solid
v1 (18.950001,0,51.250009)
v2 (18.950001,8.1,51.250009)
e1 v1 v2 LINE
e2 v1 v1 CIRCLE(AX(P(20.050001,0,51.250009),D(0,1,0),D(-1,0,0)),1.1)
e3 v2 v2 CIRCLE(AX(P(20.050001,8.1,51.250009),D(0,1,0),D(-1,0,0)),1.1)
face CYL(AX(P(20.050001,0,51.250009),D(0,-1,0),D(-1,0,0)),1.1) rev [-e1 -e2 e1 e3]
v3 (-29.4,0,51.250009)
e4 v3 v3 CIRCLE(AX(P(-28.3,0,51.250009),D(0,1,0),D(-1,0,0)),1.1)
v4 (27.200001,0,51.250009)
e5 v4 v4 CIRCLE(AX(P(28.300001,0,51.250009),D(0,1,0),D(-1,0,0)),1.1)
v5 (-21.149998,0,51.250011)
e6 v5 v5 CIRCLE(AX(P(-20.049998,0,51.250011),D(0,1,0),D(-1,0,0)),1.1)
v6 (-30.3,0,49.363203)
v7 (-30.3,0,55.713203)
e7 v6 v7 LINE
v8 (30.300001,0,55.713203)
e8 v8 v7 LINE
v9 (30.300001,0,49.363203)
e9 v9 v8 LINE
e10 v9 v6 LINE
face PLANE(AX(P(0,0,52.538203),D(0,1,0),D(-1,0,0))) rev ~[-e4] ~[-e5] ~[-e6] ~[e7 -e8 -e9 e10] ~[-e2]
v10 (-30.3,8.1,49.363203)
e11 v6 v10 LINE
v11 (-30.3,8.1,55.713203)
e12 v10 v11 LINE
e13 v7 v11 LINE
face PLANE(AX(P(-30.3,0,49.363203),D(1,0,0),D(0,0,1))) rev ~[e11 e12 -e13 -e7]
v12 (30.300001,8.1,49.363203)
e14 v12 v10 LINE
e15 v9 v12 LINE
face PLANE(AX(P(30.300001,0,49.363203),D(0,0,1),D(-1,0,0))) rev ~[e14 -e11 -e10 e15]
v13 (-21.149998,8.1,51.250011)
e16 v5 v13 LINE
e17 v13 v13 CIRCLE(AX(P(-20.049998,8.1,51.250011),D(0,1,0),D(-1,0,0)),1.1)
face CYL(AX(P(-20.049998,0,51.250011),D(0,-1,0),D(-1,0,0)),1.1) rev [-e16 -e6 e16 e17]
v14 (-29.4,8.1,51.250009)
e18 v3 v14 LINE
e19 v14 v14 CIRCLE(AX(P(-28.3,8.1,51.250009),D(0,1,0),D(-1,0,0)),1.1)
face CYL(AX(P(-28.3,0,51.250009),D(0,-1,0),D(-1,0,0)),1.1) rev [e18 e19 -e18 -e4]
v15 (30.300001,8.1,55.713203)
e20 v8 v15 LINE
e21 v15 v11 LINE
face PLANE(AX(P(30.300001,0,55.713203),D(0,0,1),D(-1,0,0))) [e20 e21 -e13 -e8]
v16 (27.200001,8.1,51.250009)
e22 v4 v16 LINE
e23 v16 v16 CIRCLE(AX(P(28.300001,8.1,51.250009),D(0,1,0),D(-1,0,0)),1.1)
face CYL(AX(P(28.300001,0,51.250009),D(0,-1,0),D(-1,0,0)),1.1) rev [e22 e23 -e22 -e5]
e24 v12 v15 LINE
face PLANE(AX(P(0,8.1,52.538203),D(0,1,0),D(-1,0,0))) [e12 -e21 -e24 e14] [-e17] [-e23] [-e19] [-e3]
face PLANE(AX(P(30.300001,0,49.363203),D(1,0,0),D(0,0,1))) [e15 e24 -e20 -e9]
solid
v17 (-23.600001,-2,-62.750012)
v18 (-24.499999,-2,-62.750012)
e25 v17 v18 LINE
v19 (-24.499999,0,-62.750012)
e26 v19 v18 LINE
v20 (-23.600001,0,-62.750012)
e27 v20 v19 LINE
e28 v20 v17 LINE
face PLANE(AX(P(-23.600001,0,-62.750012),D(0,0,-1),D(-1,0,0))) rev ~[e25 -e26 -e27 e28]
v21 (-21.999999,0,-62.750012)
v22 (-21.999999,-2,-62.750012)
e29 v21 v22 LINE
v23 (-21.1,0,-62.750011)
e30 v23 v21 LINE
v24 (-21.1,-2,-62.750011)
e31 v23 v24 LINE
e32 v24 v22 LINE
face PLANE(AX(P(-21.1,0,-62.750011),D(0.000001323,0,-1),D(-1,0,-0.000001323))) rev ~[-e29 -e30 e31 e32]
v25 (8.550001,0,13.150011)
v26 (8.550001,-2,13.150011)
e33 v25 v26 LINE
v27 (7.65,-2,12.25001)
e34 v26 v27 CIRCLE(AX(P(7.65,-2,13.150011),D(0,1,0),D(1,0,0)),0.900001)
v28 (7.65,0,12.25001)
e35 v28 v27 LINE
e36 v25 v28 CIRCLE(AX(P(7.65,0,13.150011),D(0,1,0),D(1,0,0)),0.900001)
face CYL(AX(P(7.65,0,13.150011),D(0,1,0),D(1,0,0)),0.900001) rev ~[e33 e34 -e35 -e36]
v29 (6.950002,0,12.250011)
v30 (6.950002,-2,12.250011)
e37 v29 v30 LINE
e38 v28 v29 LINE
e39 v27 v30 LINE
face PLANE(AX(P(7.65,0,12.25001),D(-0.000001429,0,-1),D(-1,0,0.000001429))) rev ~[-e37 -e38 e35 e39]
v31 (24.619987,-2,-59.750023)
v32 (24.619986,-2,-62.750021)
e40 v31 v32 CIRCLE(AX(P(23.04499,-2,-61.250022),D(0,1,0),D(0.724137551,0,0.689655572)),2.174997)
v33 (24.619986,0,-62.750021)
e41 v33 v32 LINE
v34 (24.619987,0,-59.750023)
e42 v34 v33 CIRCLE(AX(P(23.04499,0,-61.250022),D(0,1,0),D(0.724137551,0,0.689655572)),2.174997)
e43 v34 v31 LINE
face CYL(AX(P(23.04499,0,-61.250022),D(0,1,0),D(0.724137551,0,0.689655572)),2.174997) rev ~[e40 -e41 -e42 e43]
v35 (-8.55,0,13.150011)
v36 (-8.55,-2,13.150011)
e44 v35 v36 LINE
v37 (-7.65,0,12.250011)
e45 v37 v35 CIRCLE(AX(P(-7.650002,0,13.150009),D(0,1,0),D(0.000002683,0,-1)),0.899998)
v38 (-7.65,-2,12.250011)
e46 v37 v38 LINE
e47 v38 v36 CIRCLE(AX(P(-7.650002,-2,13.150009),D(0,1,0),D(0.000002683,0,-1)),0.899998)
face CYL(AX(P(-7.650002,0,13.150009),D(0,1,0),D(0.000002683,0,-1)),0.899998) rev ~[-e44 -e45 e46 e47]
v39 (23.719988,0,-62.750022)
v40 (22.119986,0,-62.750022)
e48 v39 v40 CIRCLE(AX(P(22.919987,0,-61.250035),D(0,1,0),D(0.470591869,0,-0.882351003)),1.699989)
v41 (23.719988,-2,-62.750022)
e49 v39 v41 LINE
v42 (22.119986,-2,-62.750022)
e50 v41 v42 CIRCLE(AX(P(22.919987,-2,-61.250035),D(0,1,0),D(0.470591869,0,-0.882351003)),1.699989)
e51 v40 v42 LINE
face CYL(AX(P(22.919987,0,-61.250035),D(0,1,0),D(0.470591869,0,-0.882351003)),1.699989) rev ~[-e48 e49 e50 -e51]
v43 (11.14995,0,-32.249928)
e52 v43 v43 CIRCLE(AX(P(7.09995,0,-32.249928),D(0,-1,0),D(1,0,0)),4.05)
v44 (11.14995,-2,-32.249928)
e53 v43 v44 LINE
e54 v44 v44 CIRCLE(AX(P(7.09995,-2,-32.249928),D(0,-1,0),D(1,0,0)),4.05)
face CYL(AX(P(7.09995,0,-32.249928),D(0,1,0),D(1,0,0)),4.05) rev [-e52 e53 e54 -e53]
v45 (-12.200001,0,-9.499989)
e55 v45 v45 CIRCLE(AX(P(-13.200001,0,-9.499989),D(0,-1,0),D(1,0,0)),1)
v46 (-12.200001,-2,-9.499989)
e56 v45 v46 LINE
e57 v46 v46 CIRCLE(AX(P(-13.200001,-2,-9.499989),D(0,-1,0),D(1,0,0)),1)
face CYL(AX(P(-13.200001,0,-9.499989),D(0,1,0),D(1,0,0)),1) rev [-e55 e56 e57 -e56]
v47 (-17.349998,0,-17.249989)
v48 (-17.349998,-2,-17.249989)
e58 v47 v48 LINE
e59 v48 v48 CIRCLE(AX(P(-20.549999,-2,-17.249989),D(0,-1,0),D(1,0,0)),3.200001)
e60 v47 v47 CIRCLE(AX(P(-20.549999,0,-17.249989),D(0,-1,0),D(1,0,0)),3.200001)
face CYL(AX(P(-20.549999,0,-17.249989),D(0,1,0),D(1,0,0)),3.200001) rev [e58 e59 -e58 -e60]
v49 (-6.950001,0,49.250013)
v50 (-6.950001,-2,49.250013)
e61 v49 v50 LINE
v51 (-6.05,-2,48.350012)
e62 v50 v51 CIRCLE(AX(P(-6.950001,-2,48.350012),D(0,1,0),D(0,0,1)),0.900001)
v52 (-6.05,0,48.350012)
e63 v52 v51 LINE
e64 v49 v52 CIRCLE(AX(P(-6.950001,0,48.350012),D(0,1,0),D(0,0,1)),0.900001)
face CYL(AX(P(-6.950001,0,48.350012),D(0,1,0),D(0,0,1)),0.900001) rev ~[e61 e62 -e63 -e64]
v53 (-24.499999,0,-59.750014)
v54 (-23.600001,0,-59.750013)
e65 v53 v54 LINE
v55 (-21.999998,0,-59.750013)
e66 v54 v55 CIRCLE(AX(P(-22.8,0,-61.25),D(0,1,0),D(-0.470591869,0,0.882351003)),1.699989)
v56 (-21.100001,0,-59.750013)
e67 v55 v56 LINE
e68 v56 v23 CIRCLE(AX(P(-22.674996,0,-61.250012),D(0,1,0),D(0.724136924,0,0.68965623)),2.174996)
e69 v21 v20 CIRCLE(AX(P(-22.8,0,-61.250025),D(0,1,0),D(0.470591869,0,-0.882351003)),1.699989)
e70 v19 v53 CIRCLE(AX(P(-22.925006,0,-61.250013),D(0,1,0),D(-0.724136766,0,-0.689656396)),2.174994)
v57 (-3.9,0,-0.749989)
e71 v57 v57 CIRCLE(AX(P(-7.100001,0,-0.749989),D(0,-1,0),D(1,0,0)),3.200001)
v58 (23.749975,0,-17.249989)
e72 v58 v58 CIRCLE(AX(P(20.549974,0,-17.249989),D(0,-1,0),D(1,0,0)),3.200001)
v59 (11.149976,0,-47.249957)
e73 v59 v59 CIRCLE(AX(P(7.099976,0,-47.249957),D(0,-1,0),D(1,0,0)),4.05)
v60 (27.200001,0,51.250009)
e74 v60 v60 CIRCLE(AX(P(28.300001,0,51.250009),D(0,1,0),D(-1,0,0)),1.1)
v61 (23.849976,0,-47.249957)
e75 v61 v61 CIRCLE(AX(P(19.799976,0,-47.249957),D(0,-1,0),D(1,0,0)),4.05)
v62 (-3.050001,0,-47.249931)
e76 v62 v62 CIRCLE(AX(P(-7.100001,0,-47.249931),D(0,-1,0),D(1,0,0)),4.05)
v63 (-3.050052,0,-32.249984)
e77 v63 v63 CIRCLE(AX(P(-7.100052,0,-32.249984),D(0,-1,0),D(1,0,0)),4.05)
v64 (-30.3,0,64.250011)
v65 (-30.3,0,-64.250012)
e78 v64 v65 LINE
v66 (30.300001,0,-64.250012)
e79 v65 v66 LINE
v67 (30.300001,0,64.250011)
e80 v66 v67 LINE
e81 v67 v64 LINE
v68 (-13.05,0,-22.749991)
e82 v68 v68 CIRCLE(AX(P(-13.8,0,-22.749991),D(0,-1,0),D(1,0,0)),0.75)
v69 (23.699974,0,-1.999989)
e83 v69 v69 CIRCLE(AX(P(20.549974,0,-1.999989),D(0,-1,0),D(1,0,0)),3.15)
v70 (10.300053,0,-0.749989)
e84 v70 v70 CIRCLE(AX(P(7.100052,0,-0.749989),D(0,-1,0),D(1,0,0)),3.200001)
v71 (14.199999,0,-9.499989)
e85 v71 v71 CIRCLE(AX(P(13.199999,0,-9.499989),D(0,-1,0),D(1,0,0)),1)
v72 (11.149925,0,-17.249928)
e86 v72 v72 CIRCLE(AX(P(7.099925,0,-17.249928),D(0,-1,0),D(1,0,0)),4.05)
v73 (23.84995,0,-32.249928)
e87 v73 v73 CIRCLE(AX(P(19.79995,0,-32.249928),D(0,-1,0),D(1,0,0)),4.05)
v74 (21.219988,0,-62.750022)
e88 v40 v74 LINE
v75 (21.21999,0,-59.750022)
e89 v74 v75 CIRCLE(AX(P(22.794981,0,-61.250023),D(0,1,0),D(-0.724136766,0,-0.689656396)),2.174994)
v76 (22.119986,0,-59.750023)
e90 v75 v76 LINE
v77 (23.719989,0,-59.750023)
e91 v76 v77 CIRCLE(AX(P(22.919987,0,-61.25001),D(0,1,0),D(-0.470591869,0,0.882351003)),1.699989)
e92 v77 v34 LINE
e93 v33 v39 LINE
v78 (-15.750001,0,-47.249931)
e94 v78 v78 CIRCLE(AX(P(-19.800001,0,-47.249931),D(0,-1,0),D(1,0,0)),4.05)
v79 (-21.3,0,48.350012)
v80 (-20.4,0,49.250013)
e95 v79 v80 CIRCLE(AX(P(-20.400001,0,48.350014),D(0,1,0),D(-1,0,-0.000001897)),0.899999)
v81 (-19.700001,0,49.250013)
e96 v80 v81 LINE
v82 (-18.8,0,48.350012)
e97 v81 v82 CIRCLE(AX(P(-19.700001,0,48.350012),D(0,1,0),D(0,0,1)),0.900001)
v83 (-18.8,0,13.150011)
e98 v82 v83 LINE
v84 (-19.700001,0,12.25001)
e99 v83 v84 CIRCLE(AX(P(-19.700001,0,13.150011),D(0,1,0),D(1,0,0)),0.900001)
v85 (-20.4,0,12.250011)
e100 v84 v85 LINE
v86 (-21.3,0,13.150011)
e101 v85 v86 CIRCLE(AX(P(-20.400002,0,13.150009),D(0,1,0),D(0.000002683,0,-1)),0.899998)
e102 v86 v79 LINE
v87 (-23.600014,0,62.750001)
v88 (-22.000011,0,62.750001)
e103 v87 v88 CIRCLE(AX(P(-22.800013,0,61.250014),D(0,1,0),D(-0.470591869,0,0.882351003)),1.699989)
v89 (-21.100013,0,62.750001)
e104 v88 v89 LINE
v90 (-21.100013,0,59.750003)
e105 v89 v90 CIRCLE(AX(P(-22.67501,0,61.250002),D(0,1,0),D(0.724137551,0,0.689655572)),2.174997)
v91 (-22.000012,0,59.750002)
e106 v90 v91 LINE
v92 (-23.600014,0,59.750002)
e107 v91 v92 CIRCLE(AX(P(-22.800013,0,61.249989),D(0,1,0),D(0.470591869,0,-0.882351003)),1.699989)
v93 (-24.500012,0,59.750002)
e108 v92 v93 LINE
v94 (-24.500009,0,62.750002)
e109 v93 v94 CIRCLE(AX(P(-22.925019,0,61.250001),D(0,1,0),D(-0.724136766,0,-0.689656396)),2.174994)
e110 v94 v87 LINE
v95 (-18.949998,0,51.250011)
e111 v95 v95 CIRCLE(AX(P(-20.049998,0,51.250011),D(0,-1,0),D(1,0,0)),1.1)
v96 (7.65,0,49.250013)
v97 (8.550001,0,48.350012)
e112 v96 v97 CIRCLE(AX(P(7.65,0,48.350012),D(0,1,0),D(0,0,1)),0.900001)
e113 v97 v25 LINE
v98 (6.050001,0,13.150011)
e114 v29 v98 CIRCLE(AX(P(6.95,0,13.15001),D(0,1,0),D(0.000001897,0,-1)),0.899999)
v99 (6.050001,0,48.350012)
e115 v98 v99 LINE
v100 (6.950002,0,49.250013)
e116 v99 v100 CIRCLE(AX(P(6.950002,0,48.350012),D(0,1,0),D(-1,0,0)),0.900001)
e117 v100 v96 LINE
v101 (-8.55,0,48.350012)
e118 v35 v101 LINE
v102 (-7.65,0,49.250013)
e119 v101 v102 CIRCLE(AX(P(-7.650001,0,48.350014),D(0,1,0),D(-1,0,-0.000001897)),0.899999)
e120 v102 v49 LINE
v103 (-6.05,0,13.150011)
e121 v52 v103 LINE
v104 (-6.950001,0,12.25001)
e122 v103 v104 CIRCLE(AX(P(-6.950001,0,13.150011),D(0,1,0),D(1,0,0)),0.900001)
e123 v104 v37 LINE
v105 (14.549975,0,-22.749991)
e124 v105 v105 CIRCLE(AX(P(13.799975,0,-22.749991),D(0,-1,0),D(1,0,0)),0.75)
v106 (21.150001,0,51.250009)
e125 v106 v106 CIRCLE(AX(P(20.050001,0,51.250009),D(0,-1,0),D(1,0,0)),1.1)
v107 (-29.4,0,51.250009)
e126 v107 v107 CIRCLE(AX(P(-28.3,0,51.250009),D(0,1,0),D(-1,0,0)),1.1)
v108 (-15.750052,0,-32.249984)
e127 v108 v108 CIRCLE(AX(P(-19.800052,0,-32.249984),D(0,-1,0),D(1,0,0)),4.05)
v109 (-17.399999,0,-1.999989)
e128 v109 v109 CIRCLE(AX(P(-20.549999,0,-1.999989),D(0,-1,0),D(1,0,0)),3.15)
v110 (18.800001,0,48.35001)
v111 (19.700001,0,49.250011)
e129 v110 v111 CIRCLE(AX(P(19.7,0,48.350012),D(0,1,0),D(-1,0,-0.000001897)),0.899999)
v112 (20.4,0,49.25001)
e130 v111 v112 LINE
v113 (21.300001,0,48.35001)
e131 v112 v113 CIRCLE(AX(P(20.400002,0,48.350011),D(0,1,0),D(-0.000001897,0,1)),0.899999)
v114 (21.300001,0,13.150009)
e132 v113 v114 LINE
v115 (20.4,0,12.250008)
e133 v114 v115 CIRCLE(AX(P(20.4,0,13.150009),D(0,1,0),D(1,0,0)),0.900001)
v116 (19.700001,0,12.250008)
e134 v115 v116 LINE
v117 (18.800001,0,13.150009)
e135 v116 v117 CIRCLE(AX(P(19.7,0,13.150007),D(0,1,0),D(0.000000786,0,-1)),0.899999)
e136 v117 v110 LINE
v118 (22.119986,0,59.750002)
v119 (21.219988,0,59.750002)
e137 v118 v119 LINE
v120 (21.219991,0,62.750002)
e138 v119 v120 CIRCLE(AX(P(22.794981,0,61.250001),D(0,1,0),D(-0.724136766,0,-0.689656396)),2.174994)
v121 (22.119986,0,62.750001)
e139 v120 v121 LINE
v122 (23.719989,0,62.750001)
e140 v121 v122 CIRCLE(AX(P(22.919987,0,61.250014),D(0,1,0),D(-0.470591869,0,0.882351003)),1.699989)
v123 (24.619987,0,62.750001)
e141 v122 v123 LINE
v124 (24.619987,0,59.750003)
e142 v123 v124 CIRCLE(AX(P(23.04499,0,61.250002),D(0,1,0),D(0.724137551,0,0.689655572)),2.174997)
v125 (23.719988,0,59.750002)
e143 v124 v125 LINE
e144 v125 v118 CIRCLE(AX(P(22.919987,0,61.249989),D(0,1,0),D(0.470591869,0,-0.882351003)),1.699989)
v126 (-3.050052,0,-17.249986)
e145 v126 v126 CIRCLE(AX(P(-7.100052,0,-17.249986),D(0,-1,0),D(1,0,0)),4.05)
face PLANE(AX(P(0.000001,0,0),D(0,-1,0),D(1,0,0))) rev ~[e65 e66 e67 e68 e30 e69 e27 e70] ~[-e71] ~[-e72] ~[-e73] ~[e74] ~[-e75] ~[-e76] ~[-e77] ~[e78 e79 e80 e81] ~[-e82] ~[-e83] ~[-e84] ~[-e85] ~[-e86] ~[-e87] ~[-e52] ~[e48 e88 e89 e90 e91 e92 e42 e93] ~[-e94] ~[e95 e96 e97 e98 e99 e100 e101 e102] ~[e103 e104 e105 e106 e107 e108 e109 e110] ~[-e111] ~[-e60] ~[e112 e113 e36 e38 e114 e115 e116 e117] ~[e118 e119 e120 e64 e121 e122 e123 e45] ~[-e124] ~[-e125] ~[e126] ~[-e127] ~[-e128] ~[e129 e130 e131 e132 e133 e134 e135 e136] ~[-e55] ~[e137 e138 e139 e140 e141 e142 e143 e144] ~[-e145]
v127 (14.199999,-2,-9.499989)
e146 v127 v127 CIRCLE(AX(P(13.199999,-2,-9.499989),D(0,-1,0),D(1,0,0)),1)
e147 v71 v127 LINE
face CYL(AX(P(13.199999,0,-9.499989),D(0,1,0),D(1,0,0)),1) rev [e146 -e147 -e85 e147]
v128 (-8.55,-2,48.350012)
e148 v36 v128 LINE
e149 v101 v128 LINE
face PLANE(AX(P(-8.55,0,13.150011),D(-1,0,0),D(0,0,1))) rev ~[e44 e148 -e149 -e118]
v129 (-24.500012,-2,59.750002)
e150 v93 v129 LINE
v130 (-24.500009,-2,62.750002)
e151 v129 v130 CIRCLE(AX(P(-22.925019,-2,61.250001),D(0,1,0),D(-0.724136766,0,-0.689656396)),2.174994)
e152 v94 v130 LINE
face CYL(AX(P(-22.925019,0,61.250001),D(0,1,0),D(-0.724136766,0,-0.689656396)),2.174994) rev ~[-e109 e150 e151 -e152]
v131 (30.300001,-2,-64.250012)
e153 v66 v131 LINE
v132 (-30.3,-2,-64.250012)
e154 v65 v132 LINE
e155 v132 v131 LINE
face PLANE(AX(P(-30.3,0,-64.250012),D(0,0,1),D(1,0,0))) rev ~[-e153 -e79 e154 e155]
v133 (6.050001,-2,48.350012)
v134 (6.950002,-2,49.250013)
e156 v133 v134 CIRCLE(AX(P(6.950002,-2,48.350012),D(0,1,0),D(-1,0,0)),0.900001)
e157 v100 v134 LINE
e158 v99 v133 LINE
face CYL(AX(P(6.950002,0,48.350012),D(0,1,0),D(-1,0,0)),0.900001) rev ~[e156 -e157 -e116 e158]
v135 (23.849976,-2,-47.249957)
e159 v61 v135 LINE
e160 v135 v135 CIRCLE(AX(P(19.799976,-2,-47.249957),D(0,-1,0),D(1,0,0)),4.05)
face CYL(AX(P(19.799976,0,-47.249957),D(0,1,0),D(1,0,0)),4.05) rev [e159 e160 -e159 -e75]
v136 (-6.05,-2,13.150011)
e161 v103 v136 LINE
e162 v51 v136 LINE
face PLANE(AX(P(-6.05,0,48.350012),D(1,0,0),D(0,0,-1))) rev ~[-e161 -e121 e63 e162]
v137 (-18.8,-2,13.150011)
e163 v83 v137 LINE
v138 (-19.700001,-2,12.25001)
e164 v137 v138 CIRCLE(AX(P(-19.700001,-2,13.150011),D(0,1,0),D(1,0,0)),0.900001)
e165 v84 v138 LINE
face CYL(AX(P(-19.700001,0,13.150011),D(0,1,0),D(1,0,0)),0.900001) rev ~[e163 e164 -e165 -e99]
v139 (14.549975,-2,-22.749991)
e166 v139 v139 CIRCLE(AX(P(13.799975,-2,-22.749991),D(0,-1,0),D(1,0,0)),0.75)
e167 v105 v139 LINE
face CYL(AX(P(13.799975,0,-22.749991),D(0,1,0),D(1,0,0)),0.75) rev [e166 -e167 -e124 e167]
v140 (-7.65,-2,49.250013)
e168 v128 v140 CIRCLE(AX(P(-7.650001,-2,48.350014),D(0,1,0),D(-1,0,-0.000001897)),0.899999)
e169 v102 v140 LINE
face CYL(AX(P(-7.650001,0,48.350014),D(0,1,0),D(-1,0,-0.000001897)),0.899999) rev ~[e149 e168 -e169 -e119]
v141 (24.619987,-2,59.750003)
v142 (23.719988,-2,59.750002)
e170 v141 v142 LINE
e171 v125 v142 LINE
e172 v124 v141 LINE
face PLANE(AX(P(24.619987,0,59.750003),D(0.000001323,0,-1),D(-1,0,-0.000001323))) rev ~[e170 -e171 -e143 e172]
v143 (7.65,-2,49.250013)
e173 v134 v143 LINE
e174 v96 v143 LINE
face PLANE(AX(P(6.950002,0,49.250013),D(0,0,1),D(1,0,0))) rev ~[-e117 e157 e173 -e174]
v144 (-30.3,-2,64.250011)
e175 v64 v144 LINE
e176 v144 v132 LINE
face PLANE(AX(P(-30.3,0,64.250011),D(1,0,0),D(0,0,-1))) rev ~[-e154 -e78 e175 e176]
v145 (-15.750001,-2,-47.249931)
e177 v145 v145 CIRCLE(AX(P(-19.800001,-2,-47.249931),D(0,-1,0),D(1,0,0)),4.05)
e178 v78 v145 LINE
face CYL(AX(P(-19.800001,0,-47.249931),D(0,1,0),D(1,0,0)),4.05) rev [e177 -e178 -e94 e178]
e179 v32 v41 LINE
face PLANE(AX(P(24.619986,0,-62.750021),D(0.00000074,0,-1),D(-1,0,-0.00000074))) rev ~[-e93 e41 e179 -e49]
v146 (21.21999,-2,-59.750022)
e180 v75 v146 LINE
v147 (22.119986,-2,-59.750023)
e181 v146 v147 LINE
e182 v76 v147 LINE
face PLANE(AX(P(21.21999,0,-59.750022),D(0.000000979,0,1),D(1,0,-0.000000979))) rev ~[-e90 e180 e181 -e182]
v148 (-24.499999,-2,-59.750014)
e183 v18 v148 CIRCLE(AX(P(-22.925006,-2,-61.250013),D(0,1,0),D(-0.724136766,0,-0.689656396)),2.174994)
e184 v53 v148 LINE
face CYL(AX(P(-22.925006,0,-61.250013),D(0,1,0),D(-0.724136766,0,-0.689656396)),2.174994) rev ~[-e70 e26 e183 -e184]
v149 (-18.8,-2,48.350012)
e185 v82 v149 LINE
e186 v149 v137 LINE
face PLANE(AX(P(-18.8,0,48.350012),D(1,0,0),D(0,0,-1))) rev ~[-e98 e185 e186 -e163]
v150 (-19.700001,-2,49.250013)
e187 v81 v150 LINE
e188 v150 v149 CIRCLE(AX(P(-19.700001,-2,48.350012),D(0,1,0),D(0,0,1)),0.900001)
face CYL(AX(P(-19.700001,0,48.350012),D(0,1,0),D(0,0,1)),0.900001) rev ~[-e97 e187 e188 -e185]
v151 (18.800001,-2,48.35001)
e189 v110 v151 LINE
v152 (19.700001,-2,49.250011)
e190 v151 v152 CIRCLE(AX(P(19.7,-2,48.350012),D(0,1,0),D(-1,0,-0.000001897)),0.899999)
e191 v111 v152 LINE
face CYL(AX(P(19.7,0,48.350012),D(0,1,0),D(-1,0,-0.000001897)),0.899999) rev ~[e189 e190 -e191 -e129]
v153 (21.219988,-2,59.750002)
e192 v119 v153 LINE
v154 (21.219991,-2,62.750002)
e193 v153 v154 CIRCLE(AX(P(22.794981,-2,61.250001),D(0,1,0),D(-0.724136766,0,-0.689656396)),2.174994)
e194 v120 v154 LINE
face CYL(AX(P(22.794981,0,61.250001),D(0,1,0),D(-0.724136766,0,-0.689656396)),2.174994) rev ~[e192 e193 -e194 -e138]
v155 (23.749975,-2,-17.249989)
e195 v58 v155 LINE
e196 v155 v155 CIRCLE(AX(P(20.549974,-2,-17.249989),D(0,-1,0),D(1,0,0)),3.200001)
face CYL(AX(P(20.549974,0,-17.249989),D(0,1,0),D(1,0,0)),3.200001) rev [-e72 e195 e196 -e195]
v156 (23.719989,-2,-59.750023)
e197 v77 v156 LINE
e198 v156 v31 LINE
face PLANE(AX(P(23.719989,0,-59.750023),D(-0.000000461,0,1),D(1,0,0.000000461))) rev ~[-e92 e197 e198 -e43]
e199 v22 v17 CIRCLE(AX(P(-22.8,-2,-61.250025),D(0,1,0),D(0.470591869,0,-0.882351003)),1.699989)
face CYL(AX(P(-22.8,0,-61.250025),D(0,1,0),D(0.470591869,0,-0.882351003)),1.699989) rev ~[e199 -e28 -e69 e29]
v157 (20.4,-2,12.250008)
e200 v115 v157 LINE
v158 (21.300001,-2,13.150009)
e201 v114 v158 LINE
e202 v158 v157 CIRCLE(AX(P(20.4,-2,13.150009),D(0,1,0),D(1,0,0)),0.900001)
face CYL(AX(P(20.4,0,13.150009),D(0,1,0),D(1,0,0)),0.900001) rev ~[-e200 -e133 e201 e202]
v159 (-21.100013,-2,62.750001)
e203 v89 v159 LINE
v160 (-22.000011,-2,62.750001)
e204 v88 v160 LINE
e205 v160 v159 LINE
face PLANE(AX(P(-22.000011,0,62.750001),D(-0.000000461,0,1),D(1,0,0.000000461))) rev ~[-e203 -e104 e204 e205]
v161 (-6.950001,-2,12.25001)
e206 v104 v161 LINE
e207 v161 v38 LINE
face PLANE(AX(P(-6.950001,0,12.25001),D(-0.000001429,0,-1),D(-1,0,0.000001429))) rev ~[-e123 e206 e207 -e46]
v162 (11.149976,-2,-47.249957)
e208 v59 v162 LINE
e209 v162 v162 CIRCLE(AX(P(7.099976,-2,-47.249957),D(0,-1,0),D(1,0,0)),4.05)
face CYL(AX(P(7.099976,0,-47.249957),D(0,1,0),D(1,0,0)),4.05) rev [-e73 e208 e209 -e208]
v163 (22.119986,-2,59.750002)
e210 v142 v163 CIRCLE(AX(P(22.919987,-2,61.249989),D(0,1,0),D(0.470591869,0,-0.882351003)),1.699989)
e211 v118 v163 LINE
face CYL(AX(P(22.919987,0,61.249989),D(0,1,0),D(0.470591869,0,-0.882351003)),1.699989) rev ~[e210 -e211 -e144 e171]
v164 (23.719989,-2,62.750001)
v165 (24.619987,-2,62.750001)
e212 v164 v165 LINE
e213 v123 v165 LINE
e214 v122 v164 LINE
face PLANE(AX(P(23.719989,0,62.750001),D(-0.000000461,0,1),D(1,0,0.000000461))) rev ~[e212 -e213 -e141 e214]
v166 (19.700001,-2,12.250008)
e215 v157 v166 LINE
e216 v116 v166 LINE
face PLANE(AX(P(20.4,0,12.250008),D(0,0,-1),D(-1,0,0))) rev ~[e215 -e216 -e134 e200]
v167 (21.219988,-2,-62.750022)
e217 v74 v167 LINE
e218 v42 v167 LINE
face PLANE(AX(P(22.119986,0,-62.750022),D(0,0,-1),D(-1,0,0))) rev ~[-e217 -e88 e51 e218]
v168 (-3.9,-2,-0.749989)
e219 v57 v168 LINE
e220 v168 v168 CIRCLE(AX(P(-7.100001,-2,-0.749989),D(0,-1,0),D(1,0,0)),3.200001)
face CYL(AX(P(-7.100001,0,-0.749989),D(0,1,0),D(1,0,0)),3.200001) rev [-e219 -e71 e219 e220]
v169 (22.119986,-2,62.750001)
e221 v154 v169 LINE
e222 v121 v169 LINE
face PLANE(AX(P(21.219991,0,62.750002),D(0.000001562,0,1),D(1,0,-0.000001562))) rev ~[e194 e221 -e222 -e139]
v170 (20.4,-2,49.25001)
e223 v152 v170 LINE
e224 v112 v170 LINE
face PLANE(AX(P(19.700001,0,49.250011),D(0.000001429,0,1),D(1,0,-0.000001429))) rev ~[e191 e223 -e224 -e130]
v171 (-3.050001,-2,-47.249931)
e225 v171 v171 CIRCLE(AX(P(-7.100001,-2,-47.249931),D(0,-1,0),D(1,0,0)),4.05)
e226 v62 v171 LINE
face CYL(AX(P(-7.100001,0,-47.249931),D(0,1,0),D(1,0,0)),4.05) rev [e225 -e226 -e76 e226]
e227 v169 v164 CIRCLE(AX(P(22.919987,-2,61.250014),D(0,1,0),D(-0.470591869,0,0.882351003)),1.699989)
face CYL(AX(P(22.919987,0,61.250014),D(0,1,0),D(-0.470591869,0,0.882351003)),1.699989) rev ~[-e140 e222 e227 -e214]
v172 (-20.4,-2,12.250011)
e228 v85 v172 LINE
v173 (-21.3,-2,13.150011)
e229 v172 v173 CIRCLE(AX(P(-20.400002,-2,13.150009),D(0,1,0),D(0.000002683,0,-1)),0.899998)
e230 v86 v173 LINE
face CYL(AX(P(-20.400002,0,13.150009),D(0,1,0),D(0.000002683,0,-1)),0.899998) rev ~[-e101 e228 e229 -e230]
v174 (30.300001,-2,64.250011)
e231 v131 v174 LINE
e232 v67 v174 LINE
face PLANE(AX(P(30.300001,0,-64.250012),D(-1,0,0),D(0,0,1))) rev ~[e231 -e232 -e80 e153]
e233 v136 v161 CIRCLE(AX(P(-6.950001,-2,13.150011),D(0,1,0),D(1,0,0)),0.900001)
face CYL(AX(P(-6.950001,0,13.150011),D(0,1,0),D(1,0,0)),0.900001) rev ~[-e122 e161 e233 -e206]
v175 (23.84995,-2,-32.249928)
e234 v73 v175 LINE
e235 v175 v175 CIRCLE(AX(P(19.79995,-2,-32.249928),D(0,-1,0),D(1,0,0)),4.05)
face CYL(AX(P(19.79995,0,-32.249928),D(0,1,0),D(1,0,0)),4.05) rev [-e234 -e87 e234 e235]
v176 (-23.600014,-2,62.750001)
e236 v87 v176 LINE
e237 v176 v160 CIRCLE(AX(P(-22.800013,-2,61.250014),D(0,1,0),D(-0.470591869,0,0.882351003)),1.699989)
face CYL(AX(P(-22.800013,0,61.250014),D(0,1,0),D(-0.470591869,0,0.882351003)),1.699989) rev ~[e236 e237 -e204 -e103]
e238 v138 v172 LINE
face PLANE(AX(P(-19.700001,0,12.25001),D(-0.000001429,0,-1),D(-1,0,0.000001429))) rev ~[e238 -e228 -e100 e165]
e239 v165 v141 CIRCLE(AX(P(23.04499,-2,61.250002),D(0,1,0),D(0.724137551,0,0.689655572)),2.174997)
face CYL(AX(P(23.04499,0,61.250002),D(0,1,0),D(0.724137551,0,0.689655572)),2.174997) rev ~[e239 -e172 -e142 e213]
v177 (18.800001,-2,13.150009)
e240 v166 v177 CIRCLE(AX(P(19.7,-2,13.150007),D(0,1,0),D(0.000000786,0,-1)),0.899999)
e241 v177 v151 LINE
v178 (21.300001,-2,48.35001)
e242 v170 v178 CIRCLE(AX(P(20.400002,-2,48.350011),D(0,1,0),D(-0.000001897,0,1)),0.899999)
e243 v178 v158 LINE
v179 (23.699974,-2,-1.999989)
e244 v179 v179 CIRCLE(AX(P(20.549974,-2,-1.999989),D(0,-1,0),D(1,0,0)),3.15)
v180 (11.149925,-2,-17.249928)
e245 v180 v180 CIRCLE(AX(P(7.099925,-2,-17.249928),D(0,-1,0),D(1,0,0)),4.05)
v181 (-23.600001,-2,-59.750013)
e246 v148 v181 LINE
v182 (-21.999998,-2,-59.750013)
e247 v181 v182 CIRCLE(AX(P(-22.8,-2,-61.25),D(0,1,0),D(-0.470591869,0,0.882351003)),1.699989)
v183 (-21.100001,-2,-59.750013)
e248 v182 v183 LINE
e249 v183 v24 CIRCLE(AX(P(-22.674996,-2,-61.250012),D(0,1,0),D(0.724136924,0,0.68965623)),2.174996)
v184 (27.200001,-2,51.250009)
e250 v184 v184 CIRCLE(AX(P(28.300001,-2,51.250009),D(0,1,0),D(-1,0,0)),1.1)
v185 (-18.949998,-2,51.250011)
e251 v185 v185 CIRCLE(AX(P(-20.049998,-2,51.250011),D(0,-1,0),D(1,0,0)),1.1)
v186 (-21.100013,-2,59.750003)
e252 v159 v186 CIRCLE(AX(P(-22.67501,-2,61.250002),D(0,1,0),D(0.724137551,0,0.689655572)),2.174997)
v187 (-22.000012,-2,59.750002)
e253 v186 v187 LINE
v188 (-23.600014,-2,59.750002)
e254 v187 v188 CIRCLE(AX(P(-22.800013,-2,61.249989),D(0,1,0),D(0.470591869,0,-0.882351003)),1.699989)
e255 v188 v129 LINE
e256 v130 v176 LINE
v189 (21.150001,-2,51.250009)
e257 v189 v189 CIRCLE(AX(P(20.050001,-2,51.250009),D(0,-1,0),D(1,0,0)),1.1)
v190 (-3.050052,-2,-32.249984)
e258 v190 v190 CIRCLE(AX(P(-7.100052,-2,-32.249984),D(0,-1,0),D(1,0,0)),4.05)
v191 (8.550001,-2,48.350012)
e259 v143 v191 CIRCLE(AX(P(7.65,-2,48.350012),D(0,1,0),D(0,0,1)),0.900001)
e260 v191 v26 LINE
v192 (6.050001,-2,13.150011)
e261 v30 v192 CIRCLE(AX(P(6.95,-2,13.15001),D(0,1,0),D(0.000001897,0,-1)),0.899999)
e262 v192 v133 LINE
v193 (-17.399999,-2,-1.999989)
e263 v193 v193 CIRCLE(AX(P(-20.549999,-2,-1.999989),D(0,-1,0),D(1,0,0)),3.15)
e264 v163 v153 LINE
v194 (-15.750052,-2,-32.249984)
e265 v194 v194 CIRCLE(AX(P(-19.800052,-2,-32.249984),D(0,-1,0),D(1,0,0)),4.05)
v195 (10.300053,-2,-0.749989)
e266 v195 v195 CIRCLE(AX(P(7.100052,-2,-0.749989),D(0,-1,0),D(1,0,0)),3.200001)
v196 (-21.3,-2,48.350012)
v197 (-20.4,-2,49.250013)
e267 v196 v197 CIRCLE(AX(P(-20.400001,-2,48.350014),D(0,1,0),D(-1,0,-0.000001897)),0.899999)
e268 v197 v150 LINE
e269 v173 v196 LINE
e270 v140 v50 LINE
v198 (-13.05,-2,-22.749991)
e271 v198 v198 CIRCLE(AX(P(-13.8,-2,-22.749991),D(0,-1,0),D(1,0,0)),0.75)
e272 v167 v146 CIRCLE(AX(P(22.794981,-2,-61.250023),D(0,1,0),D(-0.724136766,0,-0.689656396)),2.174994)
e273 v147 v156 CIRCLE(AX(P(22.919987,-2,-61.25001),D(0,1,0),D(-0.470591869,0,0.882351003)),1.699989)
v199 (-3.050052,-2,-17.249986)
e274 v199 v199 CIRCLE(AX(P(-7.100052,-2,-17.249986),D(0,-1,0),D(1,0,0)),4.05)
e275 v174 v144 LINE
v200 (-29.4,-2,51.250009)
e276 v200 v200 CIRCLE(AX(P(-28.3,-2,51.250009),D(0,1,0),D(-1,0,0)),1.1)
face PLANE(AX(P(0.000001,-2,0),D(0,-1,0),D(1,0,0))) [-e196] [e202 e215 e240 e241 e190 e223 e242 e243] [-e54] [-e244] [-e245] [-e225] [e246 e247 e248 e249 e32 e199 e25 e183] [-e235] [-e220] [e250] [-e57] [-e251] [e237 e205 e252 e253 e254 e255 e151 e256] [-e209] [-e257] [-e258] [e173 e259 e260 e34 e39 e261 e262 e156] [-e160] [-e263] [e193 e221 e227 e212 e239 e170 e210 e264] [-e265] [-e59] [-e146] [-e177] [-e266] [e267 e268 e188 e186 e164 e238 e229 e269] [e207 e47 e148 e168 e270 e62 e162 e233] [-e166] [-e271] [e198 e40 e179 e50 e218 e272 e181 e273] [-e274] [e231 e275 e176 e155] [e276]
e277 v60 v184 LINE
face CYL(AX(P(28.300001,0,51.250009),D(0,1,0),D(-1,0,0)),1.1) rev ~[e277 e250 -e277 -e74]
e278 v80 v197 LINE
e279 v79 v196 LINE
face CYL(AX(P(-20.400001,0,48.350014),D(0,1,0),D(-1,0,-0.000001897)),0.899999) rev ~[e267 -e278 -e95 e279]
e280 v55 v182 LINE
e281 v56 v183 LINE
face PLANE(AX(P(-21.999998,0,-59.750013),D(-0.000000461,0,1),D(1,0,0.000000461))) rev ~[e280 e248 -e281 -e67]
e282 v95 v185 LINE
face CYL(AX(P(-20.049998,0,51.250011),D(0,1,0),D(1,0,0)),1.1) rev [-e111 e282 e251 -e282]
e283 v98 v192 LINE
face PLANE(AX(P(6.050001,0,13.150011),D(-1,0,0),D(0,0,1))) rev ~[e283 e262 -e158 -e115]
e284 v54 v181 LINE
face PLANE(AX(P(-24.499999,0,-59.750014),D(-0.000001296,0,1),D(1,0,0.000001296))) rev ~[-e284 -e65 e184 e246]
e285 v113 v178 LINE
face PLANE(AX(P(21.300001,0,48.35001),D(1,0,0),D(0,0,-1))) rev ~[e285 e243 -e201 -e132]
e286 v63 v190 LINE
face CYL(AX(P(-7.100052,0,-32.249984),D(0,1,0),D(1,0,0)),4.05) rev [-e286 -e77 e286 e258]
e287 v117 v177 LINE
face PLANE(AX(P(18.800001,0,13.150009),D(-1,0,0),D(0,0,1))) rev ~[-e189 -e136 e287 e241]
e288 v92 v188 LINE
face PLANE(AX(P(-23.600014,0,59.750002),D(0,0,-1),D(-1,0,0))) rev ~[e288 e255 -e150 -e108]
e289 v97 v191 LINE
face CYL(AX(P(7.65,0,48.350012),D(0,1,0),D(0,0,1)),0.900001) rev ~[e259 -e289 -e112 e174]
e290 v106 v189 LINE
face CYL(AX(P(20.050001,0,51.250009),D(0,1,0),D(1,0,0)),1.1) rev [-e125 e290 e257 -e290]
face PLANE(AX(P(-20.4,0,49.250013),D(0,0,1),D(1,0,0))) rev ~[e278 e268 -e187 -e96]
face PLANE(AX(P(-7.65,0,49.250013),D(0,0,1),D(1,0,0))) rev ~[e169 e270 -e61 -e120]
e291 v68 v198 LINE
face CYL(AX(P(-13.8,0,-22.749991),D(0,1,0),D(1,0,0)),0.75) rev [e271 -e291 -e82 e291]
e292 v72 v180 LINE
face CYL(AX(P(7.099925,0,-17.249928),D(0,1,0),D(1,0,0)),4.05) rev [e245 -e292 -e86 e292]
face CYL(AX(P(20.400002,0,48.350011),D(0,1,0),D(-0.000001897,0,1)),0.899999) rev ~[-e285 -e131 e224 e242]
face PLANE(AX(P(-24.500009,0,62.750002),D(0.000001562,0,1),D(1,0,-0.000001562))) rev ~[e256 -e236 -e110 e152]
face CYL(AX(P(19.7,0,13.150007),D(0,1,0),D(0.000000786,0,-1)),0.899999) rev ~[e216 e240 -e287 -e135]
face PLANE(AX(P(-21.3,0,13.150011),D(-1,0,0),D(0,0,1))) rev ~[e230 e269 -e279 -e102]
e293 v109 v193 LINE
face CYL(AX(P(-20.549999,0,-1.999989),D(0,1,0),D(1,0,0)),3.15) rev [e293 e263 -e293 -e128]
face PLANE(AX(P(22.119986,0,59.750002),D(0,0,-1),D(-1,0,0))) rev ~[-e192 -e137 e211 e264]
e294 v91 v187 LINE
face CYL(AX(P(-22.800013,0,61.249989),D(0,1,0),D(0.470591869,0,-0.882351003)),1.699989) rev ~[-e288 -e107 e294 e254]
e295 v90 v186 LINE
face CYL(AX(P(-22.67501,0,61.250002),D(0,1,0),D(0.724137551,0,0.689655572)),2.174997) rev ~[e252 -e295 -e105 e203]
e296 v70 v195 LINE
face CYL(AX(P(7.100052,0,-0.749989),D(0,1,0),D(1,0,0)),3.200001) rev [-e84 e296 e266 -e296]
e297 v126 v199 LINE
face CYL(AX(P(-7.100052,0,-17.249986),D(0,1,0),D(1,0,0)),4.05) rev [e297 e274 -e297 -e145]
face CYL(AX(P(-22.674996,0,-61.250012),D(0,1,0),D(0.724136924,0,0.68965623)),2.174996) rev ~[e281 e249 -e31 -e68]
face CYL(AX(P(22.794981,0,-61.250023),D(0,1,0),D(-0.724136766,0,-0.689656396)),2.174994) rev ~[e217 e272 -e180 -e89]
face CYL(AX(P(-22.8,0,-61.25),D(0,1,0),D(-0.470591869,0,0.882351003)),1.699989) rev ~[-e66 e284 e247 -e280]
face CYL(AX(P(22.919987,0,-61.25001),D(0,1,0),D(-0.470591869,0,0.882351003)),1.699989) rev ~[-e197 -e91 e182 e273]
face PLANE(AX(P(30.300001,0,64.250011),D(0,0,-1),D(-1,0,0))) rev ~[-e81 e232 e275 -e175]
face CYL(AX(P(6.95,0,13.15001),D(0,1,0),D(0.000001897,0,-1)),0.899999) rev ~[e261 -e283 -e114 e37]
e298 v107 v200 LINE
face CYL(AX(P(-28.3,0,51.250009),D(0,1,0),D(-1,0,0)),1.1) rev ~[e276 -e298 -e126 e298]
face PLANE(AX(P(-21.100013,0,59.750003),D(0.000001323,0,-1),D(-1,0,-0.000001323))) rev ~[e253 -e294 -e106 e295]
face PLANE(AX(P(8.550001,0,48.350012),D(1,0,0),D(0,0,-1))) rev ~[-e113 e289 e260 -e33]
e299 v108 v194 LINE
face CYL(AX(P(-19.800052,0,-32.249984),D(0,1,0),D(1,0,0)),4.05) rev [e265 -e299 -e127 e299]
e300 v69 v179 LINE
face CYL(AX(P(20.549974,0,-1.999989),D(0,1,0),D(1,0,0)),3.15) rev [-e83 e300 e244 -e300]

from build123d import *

# Parameters (mm, degrees)
F0_R     = 4.05
F0_R_2   = 3.200001
F0_R_3   = 3.15
F0_R_4   = 0.75
F0_R_5   = 1
F0_R_6   = 1.1
F1_DEPTH = 2
F2_W     = 60.600001
F2_H     = 6.35
F2_R     = 1.1
F3_DEPTH = 8.1
F4_R     = 1.1
F5_DEPTH = 25


# Not quite as in the source:
# - ends of sketch curves that miss each other by under 0.0002 mm in the source are joined


with BuildPart() as f1:
    # F0 (on Front) → F1 (new body)
    with BuildSketch(Plane.XZ):
        Polygon((-30.3, -61.250013), (-30.3, -64.250012), (30.300001, -64.250012), (30.300001, 64.250011), (-30.3, 64.250011), align=None)
        with BuildLine():
            ThreePointArc((-23.600001, -59.750013), (-22.7999995588, -59.550011), (-21.9999982215, -59.7500134152))
            Line((-21.9999982215, -59.7500134152), (-21.100001, -59.750013))
            ThreePointArc((-21.100001, -59.750013), (-20.5, -61.2500126379), (-21.1000001998, -62.7500108097))
            Line((-21.1000001998, -62.7500108097), (-21.999999, -62.750012))
            ThreePointArc((-21.999999, -62.750012), (-22.7999995588, -62.950014), (-23.600001, -62.750012))
            Line((-23.600001, -62.750012), (-24.499999, -62.750012))
            ThreePointArc((-24.499999, -62.750012), (-25.1, -61.2500126379), (-24.4999988252, -59.7500141665))
            Line((-24.4999988252, -59.7500141665), (-23.600001, -59.750013))
        make_face(mode=Mode.SUBTRACT)
        with Locations((-19.800001, -47.249931)):
            Circle(F0_R, mode=Mode.SUBTRACT)
        with Locations((-19.800052, -32.249984)):
            Circle(F0_R, mode=Mode.SUBTRACT)
        with Locations((-7.100001, -47.249931)):
            Circle(F0_R, mode=Mode.SUBTRACT)
        with Locations((-7.100052, -32.249984)):
            Circle(F0_R, mode=Mode.SUBTRACT)
        with Locations((-20.549999, -17.249989)):
            Circle(F0_R_2, mode=Mode.SUBTRACT)
        with Locations((-20.549999, -1.999989)):
            Circle(F0_R_3, mode=Mode.SUBTRACT)
        with Locations((-13.8, -22.749991)):
            Circle(F0_R_4, mode=Mode.SUBTRACT)
        with Locations((-7.100052, -17.249986)):
            Circle(F0_R, mode=Mode.SUBTRACT)
        with Locations((-13.200001, -9.499989)):
            Circle(F0_R_5, mode=Mode.SUBTRACT)
        with Locations((-7.100001, -0.749989)):
            Circle(F0_R_2, mode=Mode.SUBTRACT)
        with Locations((7.099976, -47.249957)):
            Circle(F0_R, mode=Mode.SUBTRACT)
        with Locations((7.09995, -32.249928)):
            Circle(F0_R, mode=Mode.SUBTRACT)
        with BuildLine():
            ThreePointArc((22.119986, -59.750023), (22.9199874412, -59.550021), (23.7199887785, -59.7500234152))
            Line((23.7199887785, -59.7500234152), (24.619987, -59.750023))
            ThreePointArc((24.619987, -59.750023), (25.219987, -61.250023), (24.6199863008, -62.7500213341))
            Line((24.6199863008, -62.7500213341), (23.719988, -62.750022))
            ThreePointArc((23.719988, -62.750022), (22.9199874412, -62.950024), (22.119986, -62.750022))
            Line((22.119986, -62.750022), (21.219988, -62.750022))
            ThreePointArc((21.219988, -62.750022), (20.619987, -61.250023), (21.2199901249, -59.7500221189))
            Line((21.2199901249, -59.7500221189), (22.119986, -59.750023))
        make_face(mode=Mode.SUBTRACT)
        with Locations((19.799976, -47.249957)):
            Circle(F0_R, mode=Mode.SUBTRACT)
        with Locations((19.79995, -32.249928)):
            Circle(F0_R, mode=Mode.SUBTRACT)
        with Locations((7.099925, -17.249928)):
            Circle(F0_R, mode=Mode.SUBTRACT)
        with Locations((13.799975, -22.749991)):
            Circle(F0_R_4, mode=Mode.SUBTRACT)
        with Locations((7.100052, -0.749989)):
            Circle(F0_R_2, mode=Mode.SUBTRACT)
        with Locations((13.199999, -9.499989)):
            Circle(F0_R_5, mode=Mode.SUBTRACT)
        with Locations((20.549974, -17.249989)):
            Circle(F0_R_2, mode=Mode.SUBTRACT)
        with Locations((20.549974, -1.999989)):
            Circle(F0_R_3, mode=Mode.SUBTRACT)
        with BuildLine():
            Line((-21.3, 13.150011), (-21.3, 30.750012))
            Line((-21.3, 30.750012), (-21.3, 48.350012))
            ThreePointArc((-21.3, 48.350012), (-21.0363968102, 48.9864088102), (-20.4, 49.250013))
            Line((-20.4, 49.250013), (-19.700001, 49.250013))
            ThreePointArc((-19.700001, 49.250013), (-19.0636041898, 48.9864088102), (-18.8, 48.350012))
            Line((-18.8, 48.350012), (-18.8, 30.750012))
            Line((-18.8, 30.750012), (-18.8, 13.150011))
            ThreePointArc((-18.8, 13.150011), (-19.0636041898, 12.5136141898), (-19.700001, 12.25001))
            Line((-19.700001, 12.25001), (-20.4, 12.250011))
            ThreePointArc((-20.4, 12.250011), (-21.0363968102, 12.5136141898), (-21.3, 13.150011))
        make_face(mode=Mode.SUBTRACT)
        with BuildLine():
            Line((-8.55, 13.150011), (-8.55, 30.750012))
            Line((-8.55, 30.750012), (-8.55, 48.350012))
            ThreePointArc((-8.55, 48.350012), (-8.2863968102, 48.9864088102), (-7.65, 49.250013))
            Line((-7.65, 49.250013), (-6.950001, 49.250013))
            ThreePointArc((-6.950001, 49.250013), (-6.3136041898, 48.9864088102), (-6.05, 48.350012))
            Line((-6.05, 48.350012), (-6.05, 30.750012))
            Line((-6.05, 30.750012), (-6.05, 13.150011))
            ThreePointArc((-6.05, 13.150011), (-6.3136041898, 12.5136141898), (-6.950001, 12.25001))
            Line((-6.950001, 12.25001), (-7.65, 12.250011))
            ThreePointArc((-7.65, 12.250011), (-8.2863968102, 12.5136141898), (-8.55, 13.150011))
        make_face(mode=Mode.SUBTRACT)
        with BuildLine():
            ThreePointArc((-23.600014, 62.750001), (-22.8000125588, 62.950003), (-22.0000112215, 62.7500005848))
            Line((-22.0000112215, 62.7500005848), (-21.100013, 62.750001))
            ThreePointArc((-21.100013, 62.750001), (-20.500013, 61.2500013621), (-21.1000131998, 59.7500031903))
            Line((-21.1000131998, 59.7500031903), (-22.000012, 59.750002))
            ThreePointArc((-22.000012, 59.750002), (-22.8000125588, 59.55), (-23.600014, 59.750002))
            Line((-23.600014, 59.750002), (-24.500012, 59.750002))
            ThreePointArc((-24.500012, 59.750002), (-25.100013, 61.2500013621), (-24.5000093757, 62.7500024055))
            Line((-24.5000093757, 62.7500024055), (-23.600014, 62.750001))
        make_face(mode=Mode.SUBTRACT)
        with Locations((-20.049998, 51.250011)):
            Circle(F0_R_6, mode=Mode.SUBTRACT)
        with BuildLine():
            Line((6.050001, 13.150011), (6.050001, 30.750012))
            Line((6.050001, 30.750012), (6.050001, 48.350012))
            ThreePointArc((6.050001, 48.350012), (6.3136051898, 48.9864088102), (6.950002, 49.250013))
            Line((6.950002, 49.250013), (7.65, 49.250013))
            ThreePointArc((7.65, 49.250013), (8.2863968102, 48.9864088102), (8.550001, 48.350012))
            Line((8.550001, 48.350012), (8.550001, 30.750012))
            Line((8.550001, 30.750012), (8.550001, 13.150011))
            ThreePointArc((8.550001, 13.150011), (8.2863968102, 12.5136141898), (7.65, 12.25001))
            Line((7.65, 12.25001), (6.950002, 12.250011))
            ThreePointArc((6.950002, 12.250011), (6.3136051898, 12.5136141898), (6.050001, 13.150011))
        make_face(mode=Mode.SUBTRACT)
        with BuildLine():
            Line((18.800001, 13.150009), (18.800001, 30.750009))
            Line((18.800001, 30.750009), (18.800001, 48.35001))
            ThreePointArc((18.800001, 48.35001), (19.0636041898, 48.9864068102), (19.700001, 49.250011))
            Line((19.700001, 49.250011), (20.4, 49.25001))
            ThreePointArc((20.4, 49.25001), (21.0363968102, 48.9864068102), (21.300001, 48.35001))
            Line((21.300001, 48.35001), (21.300001, 30.750009))
            Line((21.300001, 30.750009), (21.300001, 13.150009))
            ThreePointArc((21.300001, 13.150009), (21.0363968102, 12.5136121898), (20.4, 12.250008))
            Line((20.4, 12.250008), (19.700001, 12.250008))
            ThreePointArc((19.700001, 12.250008), (19.0636041898, 12.5136121898), (18.800001, 13.150009))
        make_face(mode=Mode.SUBTRACT)
        with Locations((20.050001, 51.250009)):
            Circle(F0_R_6, mode=Mode.SUBTRACT)
        with BuildLine():
            Line((22.119986, 59.750002), (21.219988, 59.750002))
            ThreePointArc((21.219988, 59.750002), (20.619987, 61.2500013621), (21.2199906243, 62.7500024055))
            Line((21.2199906243, 62.7500024055), (22.119986, 62.750001))
            ThreePointArc((22.119986, 62.750001), (22.9199874412, 62.950003), (23.7199887785, 62.7500005848))
            Line((23.7199887785, 62.7500005848), (24.619987, 62.750001))
            ThreePointArc((24.619987, 62.750001), (25.219987, 61.2500013621), (24.6199868002, 59.7500031903))
            Line((24.6199868002, 59.7500031903), (23.719988, 59.750002))
            ThreePointArc((23.719988, 59.750002), (22.9199874412, 59.55), (22.119986, 59.750002))
        make_face(mode=Mode.SUBTRACT)
    extrude(amount=F1_DEPTH)

    # F4 (on face) → F5 (cut)
    with BuildSketch(Plane(origin=(0, 0, 0), x_dir=(-1, 0, 0), z_dir=(0, 1, 0))):
        with Locations((-28.300001, 51.250009)):
            Circle(F4_R)
        with Locations((28.3, 51.250009)):
            Circle(F4_R)
    extrude(amount=-F5_DEPTH, mode=Mode.SUBTRACT)


with BuildPart() as f3:
    # F2 (on face) → F3 (new body)
    with BuildSketch(Plane(origin=(0, 0, 0), x_dir=(-1, 0, 0), z_dir=(0, 1, 0))):
        with Locations((-5e-07, 52.5382029457)):
            Rectangle(F2_W, F2_H)
        with Locations((-28.300001, 51.250009)):
            Circle(F2_R, mode=Mode.SUBTRACT)
        with Locations((-20.050001, 51.250009)):
            Circle(F2_R, mode=Mode.SUBTRACT)
        with Locations((20.049998, 51.250011)):
            Circle(F2_R, mode=Mode.SUBTRACT)
        with Locations((28.3, 51.250009)):
            Circle(F2_R, mode=Mode.SUBTRACT)
    extrude(amount=F3_DEPTH)


solid = Compound([f1.part, f3.part])
